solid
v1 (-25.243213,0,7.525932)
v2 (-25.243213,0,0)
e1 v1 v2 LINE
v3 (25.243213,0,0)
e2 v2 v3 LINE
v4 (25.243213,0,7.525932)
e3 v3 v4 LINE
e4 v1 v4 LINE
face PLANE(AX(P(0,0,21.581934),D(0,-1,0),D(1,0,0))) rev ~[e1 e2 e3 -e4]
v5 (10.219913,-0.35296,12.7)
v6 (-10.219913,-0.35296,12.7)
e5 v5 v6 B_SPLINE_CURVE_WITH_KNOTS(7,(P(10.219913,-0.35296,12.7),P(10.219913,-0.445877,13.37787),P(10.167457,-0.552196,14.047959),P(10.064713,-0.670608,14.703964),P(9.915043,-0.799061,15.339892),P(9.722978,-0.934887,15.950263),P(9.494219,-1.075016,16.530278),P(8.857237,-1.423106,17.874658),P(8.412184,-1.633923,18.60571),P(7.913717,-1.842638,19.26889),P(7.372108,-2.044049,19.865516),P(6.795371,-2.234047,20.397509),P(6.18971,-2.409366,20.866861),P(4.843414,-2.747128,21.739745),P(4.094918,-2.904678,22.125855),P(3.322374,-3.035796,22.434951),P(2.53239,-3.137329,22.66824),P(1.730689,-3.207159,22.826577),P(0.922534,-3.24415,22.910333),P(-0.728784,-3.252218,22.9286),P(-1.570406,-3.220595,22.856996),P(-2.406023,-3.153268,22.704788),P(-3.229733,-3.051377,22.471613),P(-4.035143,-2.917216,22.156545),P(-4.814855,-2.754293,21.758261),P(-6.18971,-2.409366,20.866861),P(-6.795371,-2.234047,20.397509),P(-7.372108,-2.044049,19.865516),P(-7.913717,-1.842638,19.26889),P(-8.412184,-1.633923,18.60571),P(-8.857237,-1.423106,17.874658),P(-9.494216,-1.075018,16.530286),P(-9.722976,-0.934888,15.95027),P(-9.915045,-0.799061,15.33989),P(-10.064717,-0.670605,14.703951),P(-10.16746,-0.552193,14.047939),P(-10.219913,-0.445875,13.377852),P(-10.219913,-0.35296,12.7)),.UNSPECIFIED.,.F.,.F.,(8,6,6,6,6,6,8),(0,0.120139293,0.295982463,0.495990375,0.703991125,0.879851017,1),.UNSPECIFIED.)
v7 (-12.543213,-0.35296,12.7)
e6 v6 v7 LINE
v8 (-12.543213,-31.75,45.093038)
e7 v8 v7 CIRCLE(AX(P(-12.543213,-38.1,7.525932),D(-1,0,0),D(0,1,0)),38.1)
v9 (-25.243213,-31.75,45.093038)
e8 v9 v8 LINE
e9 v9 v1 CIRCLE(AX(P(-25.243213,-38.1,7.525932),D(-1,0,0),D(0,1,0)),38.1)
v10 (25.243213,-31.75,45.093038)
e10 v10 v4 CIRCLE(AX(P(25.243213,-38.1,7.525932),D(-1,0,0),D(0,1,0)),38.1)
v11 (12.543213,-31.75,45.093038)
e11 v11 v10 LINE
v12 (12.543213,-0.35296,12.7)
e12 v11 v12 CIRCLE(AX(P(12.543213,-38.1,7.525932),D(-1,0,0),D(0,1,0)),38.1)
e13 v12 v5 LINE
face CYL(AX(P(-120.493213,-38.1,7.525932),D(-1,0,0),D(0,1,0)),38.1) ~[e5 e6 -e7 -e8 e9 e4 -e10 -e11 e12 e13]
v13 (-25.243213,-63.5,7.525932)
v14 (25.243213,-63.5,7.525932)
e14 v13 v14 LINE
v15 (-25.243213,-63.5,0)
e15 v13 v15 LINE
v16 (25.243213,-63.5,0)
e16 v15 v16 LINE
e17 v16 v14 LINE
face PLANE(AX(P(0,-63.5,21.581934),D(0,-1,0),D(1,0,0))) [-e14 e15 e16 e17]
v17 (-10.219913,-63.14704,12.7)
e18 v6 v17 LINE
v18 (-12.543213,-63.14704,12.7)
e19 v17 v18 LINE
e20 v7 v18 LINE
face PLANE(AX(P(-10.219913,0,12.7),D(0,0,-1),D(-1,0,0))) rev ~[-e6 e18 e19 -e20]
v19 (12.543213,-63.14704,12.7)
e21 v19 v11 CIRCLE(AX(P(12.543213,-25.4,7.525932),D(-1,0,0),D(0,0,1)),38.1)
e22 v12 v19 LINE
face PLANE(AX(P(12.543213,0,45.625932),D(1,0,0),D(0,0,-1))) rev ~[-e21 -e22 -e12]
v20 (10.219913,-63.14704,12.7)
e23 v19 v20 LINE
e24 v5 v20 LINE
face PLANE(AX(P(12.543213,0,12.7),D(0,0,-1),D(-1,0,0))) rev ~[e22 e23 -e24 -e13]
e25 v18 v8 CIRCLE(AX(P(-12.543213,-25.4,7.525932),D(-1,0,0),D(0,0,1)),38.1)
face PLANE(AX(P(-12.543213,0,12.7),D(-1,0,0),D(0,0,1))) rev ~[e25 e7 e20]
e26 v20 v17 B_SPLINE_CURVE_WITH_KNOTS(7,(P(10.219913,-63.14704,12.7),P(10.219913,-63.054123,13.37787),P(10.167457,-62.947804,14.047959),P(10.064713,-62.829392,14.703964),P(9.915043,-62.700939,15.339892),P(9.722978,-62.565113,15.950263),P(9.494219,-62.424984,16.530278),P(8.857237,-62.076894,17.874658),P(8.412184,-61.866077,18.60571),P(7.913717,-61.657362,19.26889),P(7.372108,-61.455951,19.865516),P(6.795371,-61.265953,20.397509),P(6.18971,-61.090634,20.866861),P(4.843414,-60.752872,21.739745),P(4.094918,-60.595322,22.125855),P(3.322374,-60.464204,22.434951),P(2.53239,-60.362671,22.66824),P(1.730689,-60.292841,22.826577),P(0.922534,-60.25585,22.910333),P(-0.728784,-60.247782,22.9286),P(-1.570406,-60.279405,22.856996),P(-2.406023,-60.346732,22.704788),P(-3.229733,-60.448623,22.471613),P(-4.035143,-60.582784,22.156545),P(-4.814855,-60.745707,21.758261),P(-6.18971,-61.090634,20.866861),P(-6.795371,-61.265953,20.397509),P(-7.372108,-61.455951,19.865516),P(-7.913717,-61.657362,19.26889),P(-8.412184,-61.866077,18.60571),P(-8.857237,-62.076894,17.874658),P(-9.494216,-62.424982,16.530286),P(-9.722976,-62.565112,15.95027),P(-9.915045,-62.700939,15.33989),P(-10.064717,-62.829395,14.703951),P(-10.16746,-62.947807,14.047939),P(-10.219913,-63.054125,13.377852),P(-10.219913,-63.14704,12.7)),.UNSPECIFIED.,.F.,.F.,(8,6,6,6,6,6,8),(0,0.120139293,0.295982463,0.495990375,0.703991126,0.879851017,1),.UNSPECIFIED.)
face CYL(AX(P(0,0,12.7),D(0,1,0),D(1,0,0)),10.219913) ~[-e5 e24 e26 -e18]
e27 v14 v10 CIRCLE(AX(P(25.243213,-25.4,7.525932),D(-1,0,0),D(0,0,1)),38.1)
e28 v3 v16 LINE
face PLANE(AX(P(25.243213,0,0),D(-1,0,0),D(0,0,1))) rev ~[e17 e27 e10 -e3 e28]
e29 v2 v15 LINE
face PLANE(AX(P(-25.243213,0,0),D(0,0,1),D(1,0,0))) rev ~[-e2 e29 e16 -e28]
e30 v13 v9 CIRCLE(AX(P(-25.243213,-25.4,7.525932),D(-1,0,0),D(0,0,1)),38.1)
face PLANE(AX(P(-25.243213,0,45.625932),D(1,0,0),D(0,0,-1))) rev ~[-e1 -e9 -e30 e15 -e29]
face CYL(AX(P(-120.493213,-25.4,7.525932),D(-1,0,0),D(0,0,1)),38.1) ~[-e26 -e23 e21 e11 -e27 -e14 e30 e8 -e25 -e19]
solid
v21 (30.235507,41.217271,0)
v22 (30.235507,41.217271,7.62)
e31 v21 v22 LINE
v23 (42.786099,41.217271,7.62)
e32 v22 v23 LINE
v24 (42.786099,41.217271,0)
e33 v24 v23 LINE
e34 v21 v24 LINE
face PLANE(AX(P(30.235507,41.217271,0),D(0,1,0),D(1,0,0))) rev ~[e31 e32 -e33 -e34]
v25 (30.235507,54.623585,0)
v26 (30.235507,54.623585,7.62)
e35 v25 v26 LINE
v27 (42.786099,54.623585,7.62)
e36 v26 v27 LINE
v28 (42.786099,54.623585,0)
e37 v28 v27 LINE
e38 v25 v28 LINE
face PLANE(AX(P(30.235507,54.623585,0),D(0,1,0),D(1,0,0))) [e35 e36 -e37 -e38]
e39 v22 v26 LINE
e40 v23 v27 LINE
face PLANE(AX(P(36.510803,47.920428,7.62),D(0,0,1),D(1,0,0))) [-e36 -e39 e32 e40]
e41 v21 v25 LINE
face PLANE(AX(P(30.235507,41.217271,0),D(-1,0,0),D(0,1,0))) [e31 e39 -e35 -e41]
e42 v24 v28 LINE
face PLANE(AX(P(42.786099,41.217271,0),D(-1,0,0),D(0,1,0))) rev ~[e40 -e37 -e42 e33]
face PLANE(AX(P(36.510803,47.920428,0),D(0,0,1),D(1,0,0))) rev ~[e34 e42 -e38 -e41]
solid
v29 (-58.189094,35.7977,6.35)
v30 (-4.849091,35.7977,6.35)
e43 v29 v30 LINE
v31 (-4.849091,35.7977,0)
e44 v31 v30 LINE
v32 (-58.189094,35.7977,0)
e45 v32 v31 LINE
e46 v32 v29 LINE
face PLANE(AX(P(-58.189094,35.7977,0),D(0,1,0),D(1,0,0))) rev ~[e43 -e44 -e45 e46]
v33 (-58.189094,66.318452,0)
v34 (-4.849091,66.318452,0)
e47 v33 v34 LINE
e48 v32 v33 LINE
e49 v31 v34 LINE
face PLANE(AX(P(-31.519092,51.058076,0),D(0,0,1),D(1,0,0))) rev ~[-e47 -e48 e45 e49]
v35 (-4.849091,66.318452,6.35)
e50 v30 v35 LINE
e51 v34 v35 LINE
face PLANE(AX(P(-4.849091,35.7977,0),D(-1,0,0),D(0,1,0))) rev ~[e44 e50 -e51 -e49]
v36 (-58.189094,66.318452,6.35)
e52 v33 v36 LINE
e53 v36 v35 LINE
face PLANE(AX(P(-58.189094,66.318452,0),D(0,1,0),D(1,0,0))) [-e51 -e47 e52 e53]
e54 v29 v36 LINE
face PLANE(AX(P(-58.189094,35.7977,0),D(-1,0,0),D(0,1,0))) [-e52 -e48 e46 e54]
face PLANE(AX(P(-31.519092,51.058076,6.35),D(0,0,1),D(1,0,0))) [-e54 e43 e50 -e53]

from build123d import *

# Parameters (mm, degrees)
F1_DEPTH    = 63.5
F2_T1_DEPTH = 203.2
F2_T3_DEPTH = 203.2
F5_W        = 53.3400033601
F5_H        = 30.5207520723
F6_DEPTH    = 6.35
F7_W        = 12.5505924225
F7_H        = 13.4063139558
F8_DEPTH    = 7.62


# Not quite as in the source:
# - a fillet or chamfer that OpenCascade refuses, or shapes differently, is made with other operations: its cross-section is extruded or revolved along the edge and cut away or added
# - the program builds the solid bodies; features that only make, move or delete a surface that nothing else refers to are left out


with BuildPart() as f1:
    # F0 (on Front) → F1 (new body)
    with BuildSketch(Plane.XZ):
        with BuildLine():
            Line((-25.2432132988, 0), (0, 0))
            Line((0, 0), (25.2432132988, 0))
            Line((25.2432132988, 0), (25.2432132988, 45.6259317593))
            Line((25.2432132988, 45.6259317593), (12.5432132988, 45.6259317593))
            Line((12.5432132988, 45.6259317593), (12.5432132988, 12.7))
            Line((12.5432132988, 12.7), (10.2199126405, 12.7))
            ThreePointArc((10.2199126405, 12.7), (0, 22.9199126405), (-10.2199126405, 12.7))
            Line((-10.2199126405, 12.7), (-12.5432132988, 12.7))
            Line((-12.5432132988, 12.7), (-12.5432132988, 45.6259317593))
            Line((-12.5432132988, 45.6259317593), (-25.2432132988, 45.6259317593))
            Line((-25.2432132988, 45.6259317593), (-25.2432132988, 0))
        make_face()
    extrude(amount=F1_DEPTH)

    # F2: fillet of radius 38.1 on 4 edges, made by hand

    # F2_s2 → F2_t1 (cut)
    with BuildSketch(Plane.YZ.offset(-120.4932132988)):
        with BuildLine():
            ThreePointArc((-25.4, 45.6259317593), (-52.3407683632, 34.4667001225), (-63.5, 7.5259317593))
            Line((-63.5, 7.5259317593), (-63.5, 45.6259317593))
            Line((-63.5, 45.6259317593), (-25.4, 45.6259317593))
        make_face()
        with BuildLine():
            ThreePointArc((0, 7.5259317593), (-11.1592316368, 34.4667001225), (-38.1, 45.6259317593))
            Line((-38.1, 45.6259317593), (0, 45.6259317593))
            Line((0, 45.6259317593), (0, 7.5259317593))
        make_face()
    extrude(amount=F2_T1_DEPTH, mode=Mode.SUBTRACT)

    # F2_s4 → F2_t3 (cut)
    with BuildSketch(Plane.YZ.offset(-82.7067867012)):
        with BuildLine():
            ThreePointArc((-25.4, 45.6259317593), (-52.3407683632, 34.4667001225), (-63.5, 7.5259317593))
            Line((-63.5, 7.5259317593), (-63.5, 45.6259317593))
            Line((-63.5, 45.6259317593), (-25.4, 45.6259317593))
        make_face()
        with BuildLine():
            ThreePointArc((0, 7.5259317593), (-11.1592316368, 34.4667001225), (-38.1, 45.6259317593))
            Line((-38.1, 45.6259317593), (0, 45.6259317593))
            Line((0, 45.6259317593), (0, 7.5259317593))
        make_face()
    extrude(amount=F2_T3_DEPTH, mode=Mode.SUBTRACT)


with BuildPart() as f6:
    # F5 (on Top) → F6 (new body)
    with BuildSketch(Plane.XY):
        with Locations((-31.5190923866, 51.0580763221)):
            Rectangle(F5_W, F5_H)
    extrude(amount=F6_DEPTH)


with BuildPart() as f8:
    # F7 (on Top) → F8 (new body)
    with BuildSketch(Plane.XY):
        with Locations((36.5108028054, 47.9204282165)):
            Rectangle(F7_W, F7_H)
    extrude(amount=F8_DEPTH)


solid = Compound([f1.part, f6.part, f8.part])
